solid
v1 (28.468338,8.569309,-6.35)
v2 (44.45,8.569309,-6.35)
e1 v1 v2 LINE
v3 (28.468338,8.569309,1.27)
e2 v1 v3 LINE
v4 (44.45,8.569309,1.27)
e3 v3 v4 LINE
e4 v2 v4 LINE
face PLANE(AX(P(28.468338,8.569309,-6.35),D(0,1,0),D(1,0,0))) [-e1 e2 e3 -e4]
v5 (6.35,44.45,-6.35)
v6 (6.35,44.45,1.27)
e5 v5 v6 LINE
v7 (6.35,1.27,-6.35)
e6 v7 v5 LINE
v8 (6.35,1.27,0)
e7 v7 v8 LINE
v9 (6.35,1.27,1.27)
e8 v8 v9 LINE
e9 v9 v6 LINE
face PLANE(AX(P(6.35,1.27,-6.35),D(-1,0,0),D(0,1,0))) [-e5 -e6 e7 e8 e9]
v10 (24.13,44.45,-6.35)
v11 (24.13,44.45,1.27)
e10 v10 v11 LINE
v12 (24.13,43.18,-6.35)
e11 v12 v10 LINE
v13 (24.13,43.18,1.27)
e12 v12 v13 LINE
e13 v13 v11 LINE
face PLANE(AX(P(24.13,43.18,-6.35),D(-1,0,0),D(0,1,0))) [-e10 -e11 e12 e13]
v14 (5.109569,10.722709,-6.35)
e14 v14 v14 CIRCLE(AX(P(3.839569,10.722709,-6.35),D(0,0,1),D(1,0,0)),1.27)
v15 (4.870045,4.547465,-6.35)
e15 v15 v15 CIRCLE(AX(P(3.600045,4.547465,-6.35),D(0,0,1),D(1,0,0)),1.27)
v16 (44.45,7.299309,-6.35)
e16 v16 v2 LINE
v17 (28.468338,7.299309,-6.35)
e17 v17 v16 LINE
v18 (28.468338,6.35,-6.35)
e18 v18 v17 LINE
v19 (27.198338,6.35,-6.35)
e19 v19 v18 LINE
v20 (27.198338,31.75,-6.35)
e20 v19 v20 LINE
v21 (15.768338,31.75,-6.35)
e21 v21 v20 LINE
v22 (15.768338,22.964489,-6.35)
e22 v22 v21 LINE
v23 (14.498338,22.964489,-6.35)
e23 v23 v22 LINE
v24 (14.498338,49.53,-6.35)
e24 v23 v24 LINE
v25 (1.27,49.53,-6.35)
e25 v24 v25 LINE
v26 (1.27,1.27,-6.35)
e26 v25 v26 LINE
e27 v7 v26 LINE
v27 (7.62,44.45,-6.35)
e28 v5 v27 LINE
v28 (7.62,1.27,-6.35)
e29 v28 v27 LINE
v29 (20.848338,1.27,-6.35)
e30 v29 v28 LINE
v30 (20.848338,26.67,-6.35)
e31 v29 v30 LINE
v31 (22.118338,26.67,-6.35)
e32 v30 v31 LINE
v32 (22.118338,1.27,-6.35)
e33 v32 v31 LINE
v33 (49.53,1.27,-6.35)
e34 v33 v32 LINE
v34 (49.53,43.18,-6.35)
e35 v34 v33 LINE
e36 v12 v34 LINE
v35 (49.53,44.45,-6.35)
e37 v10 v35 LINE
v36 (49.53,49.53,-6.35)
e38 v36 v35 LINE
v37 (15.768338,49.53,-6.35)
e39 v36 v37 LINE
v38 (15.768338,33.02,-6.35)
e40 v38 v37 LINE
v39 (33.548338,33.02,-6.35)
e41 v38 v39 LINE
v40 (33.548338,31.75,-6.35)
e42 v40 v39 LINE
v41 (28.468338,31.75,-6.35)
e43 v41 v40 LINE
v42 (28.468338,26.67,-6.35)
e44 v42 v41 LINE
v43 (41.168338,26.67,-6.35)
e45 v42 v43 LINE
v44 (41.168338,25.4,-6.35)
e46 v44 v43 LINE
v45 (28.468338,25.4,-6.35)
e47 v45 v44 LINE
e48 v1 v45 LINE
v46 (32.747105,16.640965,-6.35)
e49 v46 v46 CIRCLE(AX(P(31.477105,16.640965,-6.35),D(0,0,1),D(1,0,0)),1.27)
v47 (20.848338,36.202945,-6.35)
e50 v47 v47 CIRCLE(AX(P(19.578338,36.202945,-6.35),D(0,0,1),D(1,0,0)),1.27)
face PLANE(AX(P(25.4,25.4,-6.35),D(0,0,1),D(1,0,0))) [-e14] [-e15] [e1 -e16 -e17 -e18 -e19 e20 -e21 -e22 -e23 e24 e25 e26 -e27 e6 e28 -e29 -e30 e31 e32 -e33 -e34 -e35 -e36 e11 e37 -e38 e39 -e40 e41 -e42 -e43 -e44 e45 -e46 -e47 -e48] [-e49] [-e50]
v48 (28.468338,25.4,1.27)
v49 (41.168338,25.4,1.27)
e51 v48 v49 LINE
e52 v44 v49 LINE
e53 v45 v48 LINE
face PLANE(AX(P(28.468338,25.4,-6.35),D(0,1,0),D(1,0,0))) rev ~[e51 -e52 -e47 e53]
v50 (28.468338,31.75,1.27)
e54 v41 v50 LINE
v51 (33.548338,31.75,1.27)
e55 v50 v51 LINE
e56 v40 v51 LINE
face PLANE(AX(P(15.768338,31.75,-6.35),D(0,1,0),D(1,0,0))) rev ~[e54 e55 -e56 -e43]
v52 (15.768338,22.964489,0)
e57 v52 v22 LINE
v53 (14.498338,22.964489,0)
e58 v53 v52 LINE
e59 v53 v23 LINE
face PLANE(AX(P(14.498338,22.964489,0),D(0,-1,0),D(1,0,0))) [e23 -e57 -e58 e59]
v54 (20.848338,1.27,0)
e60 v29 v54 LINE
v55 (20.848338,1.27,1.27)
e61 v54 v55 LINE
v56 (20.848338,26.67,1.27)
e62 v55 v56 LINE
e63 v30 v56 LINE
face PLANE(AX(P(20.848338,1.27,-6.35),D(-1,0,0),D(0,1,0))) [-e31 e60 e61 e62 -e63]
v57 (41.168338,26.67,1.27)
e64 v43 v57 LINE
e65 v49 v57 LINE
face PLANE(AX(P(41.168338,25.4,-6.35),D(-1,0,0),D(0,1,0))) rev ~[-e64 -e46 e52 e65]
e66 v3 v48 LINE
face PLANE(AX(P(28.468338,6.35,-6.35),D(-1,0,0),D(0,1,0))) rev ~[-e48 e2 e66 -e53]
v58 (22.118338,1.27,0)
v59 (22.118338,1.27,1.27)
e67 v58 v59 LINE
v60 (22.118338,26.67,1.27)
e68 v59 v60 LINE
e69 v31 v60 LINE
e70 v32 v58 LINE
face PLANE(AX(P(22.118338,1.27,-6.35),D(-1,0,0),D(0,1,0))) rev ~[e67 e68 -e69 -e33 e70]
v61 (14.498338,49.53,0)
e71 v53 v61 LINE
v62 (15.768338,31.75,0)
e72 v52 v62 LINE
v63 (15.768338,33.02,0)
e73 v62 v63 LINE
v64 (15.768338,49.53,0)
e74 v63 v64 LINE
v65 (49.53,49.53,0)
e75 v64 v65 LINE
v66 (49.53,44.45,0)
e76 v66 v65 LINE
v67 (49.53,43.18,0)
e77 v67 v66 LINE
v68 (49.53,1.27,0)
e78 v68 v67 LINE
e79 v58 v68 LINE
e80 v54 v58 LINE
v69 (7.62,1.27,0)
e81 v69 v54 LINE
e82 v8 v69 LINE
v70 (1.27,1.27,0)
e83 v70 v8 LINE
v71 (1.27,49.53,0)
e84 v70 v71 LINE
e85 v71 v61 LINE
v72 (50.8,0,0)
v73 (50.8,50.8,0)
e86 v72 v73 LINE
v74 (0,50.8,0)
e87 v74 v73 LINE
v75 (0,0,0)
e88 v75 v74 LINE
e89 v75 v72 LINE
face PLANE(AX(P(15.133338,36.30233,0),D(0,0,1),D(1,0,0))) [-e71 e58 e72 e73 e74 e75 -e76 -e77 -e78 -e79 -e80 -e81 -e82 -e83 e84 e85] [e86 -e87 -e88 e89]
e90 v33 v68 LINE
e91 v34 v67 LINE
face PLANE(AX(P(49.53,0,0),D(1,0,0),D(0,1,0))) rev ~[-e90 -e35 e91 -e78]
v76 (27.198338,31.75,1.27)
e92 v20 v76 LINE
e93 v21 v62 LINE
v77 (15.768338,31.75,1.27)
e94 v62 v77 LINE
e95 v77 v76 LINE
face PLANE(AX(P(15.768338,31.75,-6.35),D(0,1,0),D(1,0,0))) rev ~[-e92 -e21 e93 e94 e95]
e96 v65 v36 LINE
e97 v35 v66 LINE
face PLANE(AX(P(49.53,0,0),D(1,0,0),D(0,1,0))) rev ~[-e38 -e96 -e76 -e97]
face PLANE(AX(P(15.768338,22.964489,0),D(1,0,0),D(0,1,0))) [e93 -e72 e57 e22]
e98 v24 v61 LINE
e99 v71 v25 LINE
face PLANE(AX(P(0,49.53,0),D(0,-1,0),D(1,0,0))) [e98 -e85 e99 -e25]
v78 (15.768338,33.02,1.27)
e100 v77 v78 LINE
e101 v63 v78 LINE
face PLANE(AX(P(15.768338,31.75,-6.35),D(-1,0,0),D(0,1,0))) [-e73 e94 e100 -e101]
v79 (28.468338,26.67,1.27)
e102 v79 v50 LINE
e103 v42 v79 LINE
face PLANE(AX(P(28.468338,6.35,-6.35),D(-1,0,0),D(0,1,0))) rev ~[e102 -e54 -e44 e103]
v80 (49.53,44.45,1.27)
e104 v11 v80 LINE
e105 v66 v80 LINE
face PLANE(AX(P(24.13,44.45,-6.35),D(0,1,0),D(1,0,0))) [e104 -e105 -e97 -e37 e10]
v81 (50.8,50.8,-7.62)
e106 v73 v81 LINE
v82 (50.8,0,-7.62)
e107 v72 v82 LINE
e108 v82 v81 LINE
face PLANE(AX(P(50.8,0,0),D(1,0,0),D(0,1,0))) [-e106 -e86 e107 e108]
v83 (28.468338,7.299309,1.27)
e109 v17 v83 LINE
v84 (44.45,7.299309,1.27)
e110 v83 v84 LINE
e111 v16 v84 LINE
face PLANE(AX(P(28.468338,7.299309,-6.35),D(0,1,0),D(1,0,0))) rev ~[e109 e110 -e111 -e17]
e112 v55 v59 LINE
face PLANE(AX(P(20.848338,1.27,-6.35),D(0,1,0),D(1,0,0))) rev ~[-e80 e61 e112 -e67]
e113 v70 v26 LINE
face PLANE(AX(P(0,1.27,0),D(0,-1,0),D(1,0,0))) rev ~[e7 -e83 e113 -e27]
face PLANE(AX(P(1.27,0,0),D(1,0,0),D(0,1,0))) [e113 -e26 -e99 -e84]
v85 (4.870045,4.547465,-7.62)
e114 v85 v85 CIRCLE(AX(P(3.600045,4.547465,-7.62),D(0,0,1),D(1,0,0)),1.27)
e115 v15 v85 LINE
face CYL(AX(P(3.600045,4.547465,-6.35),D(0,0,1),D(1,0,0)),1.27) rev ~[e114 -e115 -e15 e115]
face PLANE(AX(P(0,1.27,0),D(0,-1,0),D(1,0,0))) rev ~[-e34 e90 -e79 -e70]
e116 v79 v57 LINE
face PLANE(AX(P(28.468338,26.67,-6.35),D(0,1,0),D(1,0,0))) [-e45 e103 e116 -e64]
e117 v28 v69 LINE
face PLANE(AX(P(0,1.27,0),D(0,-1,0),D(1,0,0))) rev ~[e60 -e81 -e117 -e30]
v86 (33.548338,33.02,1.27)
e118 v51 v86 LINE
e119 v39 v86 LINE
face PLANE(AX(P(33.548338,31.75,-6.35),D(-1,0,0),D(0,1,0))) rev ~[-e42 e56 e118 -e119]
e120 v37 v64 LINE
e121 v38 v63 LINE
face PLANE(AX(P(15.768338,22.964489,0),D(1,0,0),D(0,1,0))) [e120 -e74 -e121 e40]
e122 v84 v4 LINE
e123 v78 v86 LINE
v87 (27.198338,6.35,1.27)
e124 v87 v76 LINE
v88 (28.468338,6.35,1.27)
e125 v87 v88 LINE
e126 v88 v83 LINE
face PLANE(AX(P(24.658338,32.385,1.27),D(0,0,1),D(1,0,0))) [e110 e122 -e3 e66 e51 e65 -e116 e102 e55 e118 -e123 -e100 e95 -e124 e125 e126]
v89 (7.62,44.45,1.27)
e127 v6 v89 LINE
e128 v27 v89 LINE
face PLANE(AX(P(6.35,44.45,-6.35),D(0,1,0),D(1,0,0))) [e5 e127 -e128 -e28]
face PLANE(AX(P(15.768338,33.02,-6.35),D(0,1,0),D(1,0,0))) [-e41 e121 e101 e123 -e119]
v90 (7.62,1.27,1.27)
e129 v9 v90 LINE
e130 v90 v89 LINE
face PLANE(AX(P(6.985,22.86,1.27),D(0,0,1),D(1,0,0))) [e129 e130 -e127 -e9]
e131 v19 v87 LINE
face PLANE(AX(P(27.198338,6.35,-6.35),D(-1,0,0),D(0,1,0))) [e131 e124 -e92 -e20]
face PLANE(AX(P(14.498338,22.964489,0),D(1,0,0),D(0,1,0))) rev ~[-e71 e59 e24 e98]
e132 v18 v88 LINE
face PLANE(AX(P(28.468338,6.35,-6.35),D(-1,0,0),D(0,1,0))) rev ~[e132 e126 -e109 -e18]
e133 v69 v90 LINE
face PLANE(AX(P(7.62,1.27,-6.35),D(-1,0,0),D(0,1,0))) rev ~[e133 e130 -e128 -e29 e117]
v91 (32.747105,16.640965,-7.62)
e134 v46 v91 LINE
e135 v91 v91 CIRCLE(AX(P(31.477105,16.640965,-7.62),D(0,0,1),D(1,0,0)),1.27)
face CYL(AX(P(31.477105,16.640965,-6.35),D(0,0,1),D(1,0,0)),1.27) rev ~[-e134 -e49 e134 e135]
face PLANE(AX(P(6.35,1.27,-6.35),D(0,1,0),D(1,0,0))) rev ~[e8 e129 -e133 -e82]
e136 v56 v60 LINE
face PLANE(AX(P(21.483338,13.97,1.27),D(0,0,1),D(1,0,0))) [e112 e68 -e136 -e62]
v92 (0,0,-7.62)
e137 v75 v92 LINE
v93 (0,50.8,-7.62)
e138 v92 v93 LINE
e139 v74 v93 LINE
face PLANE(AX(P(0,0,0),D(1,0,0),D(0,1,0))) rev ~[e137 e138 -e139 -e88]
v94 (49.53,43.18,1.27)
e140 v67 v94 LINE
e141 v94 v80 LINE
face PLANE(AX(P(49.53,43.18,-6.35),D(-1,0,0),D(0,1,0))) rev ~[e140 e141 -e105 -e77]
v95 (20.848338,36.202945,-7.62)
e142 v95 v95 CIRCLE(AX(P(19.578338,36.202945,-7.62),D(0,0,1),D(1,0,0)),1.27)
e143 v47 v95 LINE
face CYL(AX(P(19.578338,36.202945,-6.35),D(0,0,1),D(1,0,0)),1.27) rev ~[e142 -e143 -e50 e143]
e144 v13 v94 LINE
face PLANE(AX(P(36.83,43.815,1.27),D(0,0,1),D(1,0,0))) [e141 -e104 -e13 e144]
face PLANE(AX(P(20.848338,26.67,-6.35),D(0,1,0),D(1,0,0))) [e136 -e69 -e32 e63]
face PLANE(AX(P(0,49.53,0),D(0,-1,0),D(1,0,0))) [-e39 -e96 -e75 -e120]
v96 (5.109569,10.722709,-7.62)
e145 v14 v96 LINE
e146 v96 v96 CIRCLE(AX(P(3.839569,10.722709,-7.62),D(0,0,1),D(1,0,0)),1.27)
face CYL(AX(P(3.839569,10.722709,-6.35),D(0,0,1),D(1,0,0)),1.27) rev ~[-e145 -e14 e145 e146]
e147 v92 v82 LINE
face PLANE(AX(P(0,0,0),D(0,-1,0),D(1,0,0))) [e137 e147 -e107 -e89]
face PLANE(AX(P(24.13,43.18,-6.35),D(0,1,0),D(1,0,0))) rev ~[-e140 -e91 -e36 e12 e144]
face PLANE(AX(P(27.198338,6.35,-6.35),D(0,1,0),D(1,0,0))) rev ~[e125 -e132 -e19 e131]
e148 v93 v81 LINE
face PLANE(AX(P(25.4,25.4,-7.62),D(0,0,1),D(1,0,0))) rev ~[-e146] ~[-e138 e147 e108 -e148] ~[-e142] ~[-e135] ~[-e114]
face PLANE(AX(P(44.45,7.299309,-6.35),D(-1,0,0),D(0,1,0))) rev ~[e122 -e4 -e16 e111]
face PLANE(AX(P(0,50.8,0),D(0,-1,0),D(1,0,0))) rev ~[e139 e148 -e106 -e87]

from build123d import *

# Parameters (mm, degrees)
F0_W      = 50.8
F0_H      = 50.8
F1_DEPTH  = 7.62
F2_T      = -1.27
F3_W      = 1.27
F3_H      = 43.18
F4_DEPTH  = 7.62
F5_W      = 1.27
F5_H      = 26.6756825149
F6_DEPTH  = 7.62
F7_W      = 1.27
F7_H      = 25.4
F8_DEPTH  = 7.62
F9_W      = 17.78
F9_H      = 1.27
F10_DEPTH = 7.62
F11_W     = 1.27
F11_H     = 25.4
F12_DEPTH = 7.62
F13_W     = 12.7
F13_H     = 1.27
F14_DEPTH = 7.62
F15_W     = 15.9816620052
F15_H     = 1.27
F16_DEPTH = 7.62
F17_W     = 25.4
F17_H     = 1.27
F18_DEPTH = 7.62
F19_R     = 1.27
F20_DEPTH = 203.2


# Not quite as in the source:
# - a feature names something its author has since deleted; it is built from what else it names


with BuildPart() as f1:
    # F0 (on Top) → F1 (new body)
    with BuildSketch(Plane.XY):
        with Locations((25.4, 25.4)):
            Rectangle(F0_W, F0_H)
    extrude(amount=-F1_DEPTH)

    # F2
    f2_openings = [f1.faces().sort_by_distance(p)[0] for p in [
        (25.4, 25.4, 0),
    ]]
    offset(amount=F2_T, openings=f2_openings)

    # F3 (on face) → F4 (join)
    with BuildSketch(Plane.XY.offset(-6.35)):
        with Locations((6.985, 22.86)):
            Rectangle(F3_W, F3_H)
    extrude(amount=F4_DEPTH)

    # F5 (on Top) → F6 (join)
    with BuildSketch(Plane.XY):
        with Locations((15.1333379948, 36.3023299724)):
            Rectangle(F5_W, F5_H)
    extrude(amount=-F6_DEPTH)

    # F7 (on face) → F8 (join)
    with BuildSketch(Plane.XY.offset(-6.35)):
        with Locations((21.4833379948, 13.97)):
            Rectangle(F7_W, F7_H)
    extrude(amount=F8_DEPTH)

    # F9 (on face) → F10 (join)
    with BuildSketch(Plane.XY.offset(-6.35)):
        with Locations((24.6583379948, 32.385)):
            Rectangle(F9_W, F9_H)
    extrude(amount=F10_DEPTH)

    # F11 (on face) → F12 (join)
    with BuildSketch(Plane.XY.offset(-6.35)):
        with Locations((27.8333379948, 19.05)):
            Rectangle(F11_W, F11_H)
    extrude(amount=F12_DEPTH)

    # F13 (on face) → F14 (join)
    with BuildSketch(Plane.XY.offset(-6.35)):
        with Locations((34.8183379948, 26.035)):
            Rectangle(F13_W, F13_H)
    extrude(amount=F14_DEPTH)

    # F15 (on face) → F16 (join)
    with BuildSketch(Plane.XY.offset(-6.35)):
        with Locations((36.4591689974, 7.9343094056)):
            Rectangle(F15_W, F15_H)
    extrude(amount=F16_DEPTH)

    # F17 (on face) → F18 (join)
    with BuildSketch(Plane.XY.offset(-6.35)):
        with Locations((36.83, 43.815)):
            Rectangle(F17_W, F17_H)
    extrude(amount=F18_DEPTH)

    # F19 (on face) → F20 (cut)
    with BuildSketch(Plane.XY.offset(-6.35)):
        with Locations((3.6000448745, 4.547465127)):
            Circle(F19_R)
        with Locations((3.8395691663, 10.7227088884)):
            Circle(F19_R)
        with Locations((19.5783379948, 36.2029448152)):
            Circle(F19_R)
        with Locations((31.4771048725, 16.6409648955)):
            Circle(F19_R)
    extrude(amount=-F20_DEPTH, mode=Mode.SUBTRACT)


solid = f1.part
